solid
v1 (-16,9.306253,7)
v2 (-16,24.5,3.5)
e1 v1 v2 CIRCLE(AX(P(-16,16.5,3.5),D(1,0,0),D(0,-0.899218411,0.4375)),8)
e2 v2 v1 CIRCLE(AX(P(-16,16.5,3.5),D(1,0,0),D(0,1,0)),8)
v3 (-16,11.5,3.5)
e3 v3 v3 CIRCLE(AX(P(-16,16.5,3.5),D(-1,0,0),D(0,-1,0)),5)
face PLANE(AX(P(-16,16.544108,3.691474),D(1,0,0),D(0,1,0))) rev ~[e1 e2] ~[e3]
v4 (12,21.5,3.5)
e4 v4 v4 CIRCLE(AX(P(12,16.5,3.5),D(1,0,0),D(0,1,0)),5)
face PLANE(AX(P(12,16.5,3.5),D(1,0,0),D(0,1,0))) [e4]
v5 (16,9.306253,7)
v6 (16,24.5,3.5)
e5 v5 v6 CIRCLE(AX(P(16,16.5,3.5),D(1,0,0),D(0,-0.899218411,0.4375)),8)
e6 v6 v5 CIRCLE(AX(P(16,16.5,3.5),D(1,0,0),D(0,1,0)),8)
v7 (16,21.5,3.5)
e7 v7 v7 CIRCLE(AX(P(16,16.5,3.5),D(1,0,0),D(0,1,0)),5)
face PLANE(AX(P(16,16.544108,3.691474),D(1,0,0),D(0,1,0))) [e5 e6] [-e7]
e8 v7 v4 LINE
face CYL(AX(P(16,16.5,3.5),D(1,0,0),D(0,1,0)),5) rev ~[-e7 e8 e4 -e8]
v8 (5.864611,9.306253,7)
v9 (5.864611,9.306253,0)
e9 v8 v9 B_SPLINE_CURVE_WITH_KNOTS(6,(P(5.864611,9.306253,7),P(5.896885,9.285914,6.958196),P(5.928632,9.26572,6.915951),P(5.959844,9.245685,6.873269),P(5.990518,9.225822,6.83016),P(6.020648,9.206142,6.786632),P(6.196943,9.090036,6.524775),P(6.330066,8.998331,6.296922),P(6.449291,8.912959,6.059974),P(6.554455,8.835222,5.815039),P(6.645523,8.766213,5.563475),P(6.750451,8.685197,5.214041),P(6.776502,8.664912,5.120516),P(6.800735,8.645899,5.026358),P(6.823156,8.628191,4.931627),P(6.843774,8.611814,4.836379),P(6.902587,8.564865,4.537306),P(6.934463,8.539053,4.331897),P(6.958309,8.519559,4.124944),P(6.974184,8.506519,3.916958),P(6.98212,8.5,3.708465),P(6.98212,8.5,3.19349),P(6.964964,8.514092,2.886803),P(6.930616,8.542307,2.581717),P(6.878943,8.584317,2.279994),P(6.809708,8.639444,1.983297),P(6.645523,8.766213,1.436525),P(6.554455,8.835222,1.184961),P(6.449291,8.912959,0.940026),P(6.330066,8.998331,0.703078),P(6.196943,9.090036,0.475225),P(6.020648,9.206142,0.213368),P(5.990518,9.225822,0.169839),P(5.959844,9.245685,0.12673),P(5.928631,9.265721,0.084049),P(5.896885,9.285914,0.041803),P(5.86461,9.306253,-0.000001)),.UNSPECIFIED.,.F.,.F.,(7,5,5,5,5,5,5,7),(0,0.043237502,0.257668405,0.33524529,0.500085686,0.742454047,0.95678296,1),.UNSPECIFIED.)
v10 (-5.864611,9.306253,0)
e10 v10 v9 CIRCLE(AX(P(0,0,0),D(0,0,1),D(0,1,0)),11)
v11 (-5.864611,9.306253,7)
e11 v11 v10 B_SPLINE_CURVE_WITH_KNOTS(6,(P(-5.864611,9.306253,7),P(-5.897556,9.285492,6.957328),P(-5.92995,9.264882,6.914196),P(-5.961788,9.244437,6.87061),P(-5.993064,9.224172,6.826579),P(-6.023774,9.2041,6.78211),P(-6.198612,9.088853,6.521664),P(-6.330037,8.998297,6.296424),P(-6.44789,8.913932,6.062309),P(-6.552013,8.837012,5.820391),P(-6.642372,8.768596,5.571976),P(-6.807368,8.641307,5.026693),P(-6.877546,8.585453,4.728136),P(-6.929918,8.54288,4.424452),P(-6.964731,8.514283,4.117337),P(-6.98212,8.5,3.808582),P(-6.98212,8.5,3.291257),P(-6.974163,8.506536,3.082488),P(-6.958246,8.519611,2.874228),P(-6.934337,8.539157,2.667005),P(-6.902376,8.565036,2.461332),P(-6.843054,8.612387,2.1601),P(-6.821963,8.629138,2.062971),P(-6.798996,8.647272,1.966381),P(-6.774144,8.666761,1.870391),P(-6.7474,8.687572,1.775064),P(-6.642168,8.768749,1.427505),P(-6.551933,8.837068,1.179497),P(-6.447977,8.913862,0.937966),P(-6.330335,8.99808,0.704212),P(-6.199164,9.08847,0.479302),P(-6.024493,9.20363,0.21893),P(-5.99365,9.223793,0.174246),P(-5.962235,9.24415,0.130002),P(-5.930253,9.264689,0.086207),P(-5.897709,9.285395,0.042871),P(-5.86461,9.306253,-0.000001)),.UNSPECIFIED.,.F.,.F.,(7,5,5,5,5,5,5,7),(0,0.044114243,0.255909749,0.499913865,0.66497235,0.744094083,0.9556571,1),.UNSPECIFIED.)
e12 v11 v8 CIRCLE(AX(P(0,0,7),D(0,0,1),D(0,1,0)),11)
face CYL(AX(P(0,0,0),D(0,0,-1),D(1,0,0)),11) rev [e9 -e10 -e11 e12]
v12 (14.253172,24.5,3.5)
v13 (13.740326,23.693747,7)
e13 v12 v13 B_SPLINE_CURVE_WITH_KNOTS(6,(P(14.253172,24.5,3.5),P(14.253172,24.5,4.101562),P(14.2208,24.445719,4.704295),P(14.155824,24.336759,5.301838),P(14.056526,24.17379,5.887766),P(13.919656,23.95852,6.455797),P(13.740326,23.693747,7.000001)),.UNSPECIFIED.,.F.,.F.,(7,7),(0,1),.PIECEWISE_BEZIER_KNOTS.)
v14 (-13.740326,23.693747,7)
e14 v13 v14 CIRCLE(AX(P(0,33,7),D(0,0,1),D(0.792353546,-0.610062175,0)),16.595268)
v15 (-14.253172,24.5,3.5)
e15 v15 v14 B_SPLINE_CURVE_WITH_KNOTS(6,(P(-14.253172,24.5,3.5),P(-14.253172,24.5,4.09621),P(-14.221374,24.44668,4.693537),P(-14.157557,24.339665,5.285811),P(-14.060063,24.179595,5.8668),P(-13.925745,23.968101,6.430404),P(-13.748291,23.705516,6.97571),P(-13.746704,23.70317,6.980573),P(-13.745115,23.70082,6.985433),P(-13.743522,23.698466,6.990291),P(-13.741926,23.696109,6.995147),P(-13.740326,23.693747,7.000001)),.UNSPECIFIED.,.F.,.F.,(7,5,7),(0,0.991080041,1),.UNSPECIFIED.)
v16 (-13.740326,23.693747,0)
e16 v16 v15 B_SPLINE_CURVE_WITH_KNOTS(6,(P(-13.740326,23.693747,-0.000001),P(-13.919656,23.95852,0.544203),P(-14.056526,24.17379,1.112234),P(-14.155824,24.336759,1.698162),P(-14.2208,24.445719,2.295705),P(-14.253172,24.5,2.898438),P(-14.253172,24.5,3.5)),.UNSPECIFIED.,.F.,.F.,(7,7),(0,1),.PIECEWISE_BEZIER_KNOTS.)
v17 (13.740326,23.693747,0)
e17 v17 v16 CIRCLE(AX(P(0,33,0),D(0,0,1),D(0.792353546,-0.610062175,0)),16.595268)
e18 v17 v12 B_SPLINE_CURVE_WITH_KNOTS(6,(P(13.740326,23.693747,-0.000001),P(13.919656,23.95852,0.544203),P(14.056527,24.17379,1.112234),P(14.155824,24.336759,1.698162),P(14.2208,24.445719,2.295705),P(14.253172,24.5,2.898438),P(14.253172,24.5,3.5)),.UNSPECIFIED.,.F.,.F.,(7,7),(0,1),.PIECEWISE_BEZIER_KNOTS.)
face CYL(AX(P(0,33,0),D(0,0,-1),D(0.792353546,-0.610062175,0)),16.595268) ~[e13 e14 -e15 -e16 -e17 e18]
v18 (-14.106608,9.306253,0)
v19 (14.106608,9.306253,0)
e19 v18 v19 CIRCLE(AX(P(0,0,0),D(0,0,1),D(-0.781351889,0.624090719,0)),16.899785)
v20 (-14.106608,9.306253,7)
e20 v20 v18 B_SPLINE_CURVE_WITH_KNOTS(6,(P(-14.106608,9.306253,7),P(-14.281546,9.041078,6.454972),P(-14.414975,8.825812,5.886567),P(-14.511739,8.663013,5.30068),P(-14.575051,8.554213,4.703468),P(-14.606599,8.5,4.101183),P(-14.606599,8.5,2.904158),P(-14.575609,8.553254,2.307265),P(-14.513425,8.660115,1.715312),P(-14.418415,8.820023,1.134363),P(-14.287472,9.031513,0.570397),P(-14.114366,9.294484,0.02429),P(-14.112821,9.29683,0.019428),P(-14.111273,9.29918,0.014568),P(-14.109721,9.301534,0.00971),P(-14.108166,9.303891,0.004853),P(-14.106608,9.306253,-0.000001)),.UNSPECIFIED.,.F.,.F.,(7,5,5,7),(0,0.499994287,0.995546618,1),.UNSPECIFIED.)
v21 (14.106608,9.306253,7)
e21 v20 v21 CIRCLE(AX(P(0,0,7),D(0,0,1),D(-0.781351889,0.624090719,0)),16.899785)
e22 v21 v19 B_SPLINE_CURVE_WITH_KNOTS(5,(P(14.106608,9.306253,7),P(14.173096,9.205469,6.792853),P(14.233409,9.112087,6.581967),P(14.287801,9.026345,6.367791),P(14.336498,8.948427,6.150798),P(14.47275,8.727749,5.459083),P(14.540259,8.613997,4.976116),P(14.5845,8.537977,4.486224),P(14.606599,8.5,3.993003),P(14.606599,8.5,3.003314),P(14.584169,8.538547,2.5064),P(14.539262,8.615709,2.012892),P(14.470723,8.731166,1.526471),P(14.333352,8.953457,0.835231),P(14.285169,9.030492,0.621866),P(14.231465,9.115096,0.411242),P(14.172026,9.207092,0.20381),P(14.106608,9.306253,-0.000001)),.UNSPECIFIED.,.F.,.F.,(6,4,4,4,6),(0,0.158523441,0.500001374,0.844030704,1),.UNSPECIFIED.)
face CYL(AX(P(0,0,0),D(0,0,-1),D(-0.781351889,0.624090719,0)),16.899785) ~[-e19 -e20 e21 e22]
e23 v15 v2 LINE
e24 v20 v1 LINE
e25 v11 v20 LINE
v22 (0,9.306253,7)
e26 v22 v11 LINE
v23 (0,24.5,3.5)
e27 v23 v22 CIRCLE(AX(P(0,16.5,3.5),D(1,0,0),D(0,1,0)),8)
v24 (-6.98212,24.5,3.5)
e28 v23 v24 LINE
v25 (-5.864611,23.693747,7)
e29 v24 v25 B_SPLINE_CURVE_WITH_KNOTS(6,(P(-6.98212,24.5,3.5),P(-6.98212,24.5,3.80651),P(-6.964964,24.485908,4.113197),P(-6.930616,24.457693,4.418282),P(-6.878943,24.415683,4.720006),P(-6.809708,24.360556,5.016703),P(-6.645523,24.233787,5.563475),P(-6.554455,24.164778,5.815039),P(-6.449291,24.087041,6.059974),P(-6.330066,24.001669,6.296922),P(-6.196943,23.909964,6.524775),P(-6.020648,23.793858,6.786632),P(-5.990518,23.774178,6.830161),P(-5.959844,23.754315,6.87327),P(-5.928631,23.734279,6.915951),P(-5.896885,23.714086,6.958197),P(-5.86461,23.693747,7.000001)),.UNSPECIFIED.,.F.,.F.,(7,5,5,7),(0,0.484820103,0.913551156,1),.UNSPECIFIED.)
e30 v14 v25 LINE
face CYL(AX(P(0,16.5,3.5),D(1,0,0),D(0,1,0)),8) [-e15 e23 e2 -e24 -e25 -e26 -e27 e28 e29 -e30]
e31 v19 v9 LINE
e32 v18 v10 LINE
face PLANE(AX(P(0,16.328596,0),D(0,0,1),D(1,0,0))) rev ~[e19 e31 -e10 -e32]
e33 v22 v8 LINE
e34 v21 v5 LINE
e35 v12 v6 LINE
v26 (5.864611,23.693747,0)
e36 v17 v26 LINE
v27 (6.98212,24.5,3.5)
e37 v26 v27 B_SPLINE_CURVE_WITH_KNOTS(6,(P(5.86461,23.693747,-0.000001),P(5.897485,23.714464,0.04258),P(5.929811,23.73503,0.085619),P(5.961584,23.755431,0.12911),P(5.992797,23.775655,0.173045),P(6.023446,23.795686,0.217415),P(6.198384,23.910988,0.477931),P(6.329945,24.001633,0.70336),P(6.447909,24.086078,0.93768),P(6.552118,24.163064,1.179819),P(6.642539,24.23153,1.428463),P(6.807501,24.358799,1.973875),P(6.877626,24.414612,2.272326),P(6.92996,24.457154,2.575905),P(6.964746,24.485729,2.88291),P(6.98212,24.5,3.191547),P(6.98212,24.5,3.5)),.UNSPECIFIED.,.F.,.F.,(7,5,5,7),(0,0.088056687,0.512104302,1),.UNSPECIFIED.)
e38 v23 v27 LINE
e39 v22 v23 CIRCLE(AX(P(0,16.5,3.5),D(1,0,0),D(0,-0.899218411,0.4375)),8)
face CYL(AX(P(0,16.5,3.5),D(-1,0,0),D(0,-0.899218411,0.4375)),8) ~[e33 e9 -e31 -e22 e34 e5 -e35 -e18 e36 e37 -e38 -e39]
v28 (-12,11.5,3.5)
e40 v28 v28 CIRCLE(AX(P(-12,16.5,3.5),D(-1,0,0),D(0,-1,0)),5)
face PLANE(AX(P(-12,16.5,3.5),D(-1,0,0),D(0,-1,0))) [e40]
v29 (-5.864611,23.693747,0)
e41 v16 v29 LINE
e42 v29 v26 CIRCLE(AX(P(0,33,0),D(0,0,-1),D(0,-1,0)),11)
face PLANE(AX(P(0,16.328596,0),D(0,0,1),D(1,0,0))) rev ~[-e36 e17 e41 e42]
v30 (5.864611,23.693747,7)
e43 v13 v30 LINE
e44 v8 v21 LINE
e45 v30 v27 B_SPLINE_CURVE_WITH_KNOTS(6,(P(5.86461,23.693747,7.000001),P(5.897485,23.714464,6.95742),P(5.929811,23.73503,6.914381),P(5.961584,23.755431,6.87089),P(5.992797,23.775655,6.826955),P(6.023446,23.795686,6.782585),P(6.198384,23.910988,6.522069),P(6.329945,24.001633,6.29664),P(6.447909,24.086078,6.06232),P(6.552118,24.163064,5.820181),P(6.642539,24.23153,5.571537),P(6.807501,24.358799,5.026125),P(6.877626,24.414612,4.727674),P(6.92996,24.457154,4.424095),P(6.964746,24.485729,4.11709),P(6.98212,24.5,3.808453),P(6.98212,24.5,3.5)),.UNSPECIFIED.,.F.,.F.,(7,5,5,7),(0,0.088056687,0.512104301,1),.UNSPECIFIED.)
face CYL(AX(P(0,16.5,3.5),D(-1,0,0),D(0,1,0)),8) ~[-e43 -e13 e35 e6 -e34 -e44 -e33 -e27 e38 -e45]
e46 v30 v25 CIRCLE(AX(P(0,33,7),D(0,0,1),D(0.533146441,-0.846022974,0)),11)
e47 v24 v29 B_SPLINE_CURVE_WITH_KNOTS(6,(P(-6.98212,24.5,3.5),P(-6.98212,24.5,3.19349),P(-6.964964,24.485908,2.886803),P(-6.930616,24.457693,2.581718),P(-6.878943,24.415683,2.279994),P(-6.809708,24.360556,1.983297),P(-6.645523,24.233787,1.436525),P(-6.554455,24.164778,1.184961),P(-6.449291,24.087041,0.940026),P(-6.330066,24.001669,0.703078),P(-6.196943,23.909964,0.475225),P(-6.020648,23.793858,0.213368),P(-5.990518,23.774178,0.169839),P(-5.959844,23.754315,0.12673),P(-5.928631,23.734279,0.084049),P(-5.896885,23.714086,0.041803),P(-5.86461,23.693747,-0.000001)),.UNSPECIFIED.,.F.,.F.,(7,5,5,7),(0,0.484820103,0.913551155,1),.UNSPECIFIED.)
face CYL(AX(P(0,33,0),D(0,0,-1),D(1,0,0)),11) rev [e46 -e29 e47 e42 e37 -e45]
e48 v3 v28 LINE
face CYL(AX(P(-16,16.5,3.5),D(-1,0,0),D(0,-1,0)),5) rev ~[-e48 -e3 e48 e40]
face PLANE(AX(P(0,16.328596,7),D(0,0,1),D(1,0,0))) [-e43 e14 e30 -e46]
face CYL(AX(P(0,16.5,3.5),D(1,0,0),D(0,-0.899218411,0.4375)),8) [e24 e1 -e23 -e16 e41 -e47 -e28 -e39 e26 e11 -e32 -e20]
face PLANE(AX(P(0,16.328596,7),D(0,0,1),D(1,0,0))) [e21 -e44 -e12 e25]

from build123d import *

# Parameters (mm, degrees)
F0_R          = 11
F1_DEPTH      = 7
F3_DEPTH      = 16
F3_DEPTH_BACK = 16
F4_R          = 5
F5_DEPTH      = 4
F6_R          = 5
F7_DEPTH      = 4


# Not quite as in the source:
# - a feature of the source that left no trace in its solid (it failed there, or was rolled back) is left out


with BuildPart() as f1:
    # F0 (on Top) → F1 (new body)
    with BuildSketch(Plane.XY):
        with BuildLine():
            ThreePointArc((13.2046790968, 10.5469991105), (14.5476279215, 16.7175814785), (13.1493192392, 22.8758548676))
            ThreePointArc((13.1493192392, 22.8758548676), (0, 49.5952677326), (-13.1493192392, 22.8758548676))
            ThreePointArc((-13.1493192392, 22.8758548676), (-14.5476279215, 16.7175814785), (-13.2046790968, 10.5469991105))
            ThreePointArc((-13.2046790968, 10.5469991105), (0, -16.8997852142), (13.2046790968, 10.5469991105))
        make_face()
        Circle(F0_R, mode=Mode.SUBTRACT)
        with Locations((0, 33)):
            Circle(F0_R, mode=Mode.SUBTRACT)
    extrude(amount=F1_DEPTH)

    # F2 (on Right) → F3 (join, two sides)
    with BuildSketch(Plane.YZ) as f3_sk:
        with BuildLine():
            ThreePointArc((9.306252715, 7), (14.7041684767, -4.2958315233), (24.5, 3.5))
            ThreePointArc((24.5, 3.5), (18.2958315233, 11.2958315233), (9.306252715, 7))
        make_face()
    extrude(amount=F3_DEPTH)
    extrude(f3_sk.sketch, amount=-F3_DEPTH_BACK)

    # F4 (on face) → F5 (cut)
    with BuildSketch(Plane.YZ.offset(16)):
        with Locations((16.5, 3.5)):
            Circle(F4_R)
    extrude(amount=-F5_DEPTH, mode=Mode.SUBTRACT)

    # F6 (on face) → F7 (cut)
    with BuildSketch(Plane(origin=(-16, 0, 0), x_dir=(0, -1, 0), z_dir=(-1, 0, 0))):
        with Locations((-16.5, 3.5)):
            Circle(F6_R)
    extrude(amount=-F7_DEPTH, mode=Mode.SUBTRACT)


solid = f1.part
